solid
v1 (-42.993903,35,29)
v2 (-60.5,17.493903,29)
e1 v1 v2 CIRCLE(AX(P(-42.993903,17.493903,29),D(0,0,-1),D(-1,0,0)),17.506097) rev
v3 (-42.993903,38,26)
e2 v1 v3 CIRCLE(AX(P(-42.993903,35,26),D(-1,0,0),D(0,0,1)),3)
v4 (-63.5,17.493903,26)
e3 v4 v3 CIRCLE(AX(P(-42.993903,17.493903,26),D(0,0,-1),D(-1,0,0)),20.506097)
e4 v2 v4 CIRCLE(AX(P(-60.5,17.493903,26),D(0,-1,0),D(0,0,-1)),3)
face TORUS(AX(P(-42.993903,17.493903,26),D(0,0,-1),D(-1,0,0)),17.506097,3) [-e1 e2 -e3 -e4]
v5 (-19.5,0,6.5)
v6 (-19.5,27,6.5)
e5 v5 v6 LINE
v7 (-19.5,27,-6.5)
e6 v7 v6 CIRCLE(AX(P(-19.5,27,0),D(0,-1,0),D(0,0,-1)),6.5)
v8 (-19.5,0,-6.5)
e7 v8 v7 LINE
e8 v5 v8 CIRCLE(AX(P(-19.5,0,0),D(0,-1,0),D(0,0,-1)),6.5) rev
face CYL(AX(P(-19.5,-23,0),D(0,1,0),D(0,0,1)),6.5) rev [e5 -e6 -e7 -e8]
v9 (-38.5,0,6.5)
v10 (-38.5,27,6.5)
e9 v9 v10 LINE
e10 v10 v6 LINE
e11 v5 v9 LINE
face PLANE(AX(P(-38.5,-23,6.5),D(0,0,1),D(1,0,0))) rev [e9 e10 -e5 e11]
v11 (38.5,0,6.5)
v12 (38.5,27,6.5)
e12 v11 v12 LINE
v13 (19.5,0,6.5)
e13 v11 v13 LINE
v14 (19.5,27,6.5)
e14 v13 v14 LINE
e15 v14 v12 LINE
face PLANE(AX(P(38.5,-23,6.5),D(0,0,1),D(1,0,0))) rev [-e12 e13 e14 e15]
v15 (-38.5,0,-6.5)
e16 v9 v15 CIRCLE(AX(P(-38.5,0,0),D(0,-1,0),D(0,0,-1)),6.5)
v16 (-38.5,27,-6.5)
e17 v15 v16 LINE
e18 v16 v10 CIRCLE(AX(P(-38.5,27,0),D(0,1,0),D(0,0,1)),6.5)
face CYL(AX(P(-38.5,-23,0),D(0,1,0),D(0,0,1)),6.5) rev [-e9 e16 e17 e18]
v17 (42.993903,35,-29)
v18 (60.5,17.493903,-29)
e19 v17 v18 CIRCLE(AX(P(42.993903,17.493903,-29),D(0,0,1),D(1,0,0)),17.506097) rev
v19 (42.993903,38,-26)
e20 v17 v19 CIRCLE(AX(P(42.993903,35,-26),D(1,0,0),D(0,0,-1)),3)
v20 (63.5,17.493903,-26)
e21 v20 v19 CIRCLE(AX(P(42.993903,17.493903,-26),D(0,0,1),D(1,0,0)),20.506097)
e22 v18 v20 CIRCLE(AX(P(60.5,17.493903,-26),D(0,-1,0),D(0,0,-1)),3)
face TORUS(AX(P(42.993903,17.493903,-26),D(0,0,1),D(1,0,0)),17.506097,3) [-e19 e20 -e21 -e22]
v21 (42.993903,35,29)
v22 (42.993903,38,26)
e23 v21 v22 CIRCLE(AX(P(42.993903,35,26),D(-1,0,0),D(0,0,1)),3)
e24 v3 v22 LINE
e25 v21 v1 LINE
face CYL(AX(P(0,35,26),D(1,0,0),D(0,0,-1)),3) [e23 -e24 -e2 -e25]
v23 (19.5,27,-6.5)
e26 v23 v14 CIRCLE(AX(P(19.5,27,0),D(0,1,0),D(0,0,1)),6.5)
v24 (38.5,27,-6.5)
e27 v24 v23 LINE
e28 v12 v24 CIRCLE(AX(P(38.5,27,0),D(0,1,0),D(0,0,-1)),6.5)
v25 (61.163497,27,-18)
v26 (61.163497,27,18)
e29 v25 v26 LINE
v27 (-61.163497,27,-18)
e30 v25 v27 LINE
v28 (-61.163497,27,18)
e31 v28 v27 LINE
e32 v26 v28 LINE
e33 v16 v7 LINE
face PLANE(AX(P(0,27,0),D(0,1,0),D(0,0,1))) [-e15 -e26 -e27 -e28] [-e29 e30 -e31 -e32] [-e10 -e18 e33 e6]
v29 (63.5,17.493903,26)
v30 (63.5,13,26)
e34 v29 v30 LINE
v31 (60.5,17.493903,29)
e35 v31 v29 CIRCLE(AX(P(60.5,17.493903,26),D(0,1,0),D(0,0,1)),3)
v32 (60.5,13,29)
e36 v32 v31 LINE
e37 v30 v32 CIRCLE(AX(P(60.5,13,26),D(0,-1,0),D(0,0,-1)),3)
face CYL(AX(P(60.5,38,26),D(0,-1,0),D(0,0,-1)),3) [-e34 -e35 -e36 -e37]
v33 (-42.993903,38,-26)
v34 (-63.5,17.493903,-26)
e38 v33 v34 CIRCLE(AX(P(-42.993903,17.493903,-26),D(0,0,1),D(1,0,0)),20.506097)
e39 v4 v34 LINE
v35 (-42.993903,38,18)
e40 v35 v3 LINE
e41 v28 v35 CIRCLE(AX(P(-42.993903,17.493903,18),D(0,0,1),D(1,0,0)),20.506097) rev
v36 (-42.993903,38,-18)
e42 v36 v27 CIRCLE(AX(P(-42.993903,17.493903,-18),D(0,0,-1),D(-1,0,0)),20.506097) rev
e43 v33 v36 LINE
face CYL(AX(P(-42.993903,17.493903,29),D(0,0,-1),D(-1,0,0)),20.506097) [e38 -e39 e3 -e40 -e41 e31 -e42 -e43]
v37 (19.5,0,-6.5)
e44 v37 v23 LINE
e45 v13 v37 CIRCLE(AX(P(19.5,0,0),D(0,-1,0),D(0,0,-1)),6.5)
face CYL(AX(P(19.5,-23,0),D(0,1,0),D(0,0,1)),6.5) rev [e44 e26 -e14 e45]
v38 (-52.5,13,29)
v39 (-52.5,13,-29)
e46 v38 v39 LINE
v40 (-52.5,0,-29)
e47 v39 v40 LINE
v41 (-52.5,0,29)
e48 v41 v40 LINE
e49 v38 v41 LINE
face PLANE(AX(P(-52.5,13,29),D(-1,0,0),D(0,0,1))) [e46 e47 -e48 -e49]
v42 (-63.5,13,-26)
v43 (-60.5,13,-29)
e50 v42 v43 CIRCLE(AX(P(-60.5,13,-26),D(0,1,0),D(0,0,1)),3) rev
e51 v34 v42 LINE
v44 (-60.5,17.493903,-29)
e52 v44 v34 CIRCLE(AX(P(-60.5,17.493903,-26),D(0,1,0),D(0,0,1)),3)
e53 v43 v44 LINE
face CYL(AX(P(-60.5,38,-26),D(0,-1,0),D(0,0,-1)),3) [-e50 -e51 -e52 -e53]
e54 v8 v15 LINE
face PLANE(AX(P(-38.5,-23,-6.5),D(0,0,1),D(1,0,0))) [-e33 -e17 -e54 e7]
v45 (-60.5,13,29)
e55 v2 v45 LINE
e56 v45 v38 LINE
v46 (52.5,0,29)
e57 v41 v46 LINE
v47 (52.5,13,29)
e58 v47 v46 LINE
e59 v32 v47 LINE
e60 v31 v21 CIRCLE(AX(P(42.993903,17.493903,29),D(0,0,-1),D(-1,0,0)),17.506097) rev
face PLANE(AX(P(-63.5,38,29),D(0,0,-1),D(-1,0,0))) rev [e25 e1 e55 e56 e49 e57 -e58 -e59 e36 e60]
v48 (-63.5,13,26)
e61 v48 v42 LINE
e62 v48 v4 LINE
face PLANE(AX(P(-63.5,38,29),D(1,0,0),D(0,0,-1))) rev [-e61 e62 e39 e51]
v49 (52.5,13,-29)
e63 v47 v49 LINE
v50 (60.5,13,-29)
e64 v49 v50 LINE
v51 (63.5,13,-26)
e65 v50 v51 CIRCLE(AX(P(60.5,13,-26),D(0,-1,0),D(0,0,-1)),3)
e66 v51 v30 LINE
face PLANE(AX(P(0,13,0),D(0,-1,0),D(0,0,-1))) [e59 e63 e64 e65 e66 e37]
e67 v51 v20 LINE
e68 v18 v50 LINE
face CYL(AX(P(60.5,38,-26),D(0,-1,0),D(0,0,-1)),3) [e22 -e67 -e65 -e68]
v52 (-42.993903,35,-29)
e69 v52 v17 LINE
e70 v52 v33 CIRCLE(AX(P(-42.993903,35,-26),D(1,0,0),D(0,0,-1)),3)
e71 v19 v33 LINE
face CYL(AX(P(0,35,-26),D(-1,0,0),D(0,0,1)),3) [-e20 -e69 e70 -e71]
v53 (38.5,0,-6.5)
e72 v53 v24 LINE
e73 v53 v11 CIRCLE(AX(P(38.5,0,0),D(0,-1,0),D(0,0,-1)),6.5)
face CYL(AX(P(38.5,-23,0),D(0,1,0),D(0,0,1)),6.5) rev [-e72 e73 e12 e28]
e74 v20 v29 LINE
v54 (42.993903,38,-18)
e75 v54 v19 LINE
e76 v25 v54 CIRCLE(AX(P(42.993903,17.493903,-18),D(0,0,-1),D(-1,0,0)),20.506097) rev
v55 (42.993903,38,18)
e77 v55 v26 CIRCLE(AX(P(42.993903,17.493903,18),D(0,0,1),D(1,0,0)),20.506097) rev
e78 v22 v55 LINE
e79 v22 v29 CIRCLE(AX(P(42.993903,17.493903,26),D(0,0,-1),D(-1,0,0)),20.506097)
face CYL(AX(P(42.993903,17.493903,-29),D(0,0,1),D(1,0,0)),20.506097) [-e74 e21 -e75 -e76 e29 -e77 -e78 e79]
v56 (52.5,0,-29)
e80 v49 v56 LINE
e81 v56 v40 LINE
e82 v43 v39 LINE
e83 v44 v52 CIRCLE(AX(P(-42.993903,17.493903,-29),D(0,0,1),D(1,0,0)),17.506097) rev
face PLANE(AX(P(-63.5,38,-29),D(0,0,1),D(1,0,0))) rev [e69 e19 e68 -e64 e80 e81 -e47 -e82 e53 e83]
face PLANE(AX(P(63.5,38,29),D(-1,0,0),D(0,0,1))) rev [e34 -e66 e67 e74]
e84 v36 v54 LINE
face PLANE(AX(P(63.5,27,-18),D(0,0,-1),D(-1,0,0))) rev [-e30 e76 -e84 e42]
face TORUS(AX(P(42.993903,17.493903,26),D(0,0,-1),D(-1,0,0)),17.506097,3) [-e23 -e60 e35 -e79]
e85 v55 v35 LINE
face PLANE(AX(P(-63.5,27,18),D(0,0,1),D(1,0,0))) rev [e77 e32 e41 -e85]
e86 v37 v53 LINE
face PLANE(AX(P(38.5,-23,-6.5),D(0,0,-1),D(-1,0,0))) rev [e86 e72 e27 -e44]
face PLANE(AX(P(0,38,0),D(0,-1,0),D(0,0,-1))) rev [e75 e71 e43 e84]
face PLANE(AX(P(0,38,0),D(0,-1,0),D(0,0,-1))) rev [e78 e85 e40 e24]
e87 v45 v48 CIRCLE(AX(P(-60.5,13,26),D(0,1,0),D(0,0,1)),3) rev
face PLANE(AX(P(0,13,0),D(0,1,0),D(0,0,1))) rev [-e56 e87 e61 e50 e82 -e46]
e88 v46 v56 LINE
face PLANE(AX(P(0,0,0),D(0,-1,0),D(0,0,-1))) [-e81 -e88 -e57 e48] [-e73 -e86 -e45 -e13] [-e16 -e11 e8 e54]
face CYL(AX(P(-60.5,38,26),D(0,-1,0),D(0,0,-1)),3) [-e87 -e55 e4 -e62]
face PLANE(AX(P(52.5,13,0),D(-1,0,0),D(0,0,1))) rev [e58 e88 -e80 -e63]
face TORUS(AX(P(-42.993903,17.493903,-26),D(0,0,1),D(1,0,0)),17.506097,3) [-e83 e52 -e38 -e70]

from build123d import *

# Parameters (mm, degrees)
ESQUISSE1_W                 = 127
ESQUISSE1_H                 = 58
CREATION_PREMIER_CUBE_DEPTH = 38
ESQUISSE2_W                 = 11
ESQUISSE2_H                 = 58
ENLEVE_RECLANGLE_BAS_DEPTH  = 13
CONG_15_START               = -30
CONG_15_DEPTH               = 60
CONG_16_START               = -30
CONG_16_DEPTH               = 60
ENL_V_MAT_EXTRU_7_DEPTH     = 11
ENL_V_MAT_EXTRU_10_DEPTH    = 50
ENL_V_MAT_EXTRU_11_DEPTH    = 50
CONG_18_R                   = 3


with BuildPart() as part:
    # Esquisse1 → Creation premier cube (new body)
    with BuildSketch(Plane(origin=(0, 0, 0), x_dir=(1, 0, 0), z_dir=(0, 1, 0))):
        Rectangle(ESQUISSE1_W, ESQUISSE1_H)
    extrude(amount=CREATION_PREMIER_CUBE_DEPTH)

    # Esquisse2 → Enleve reclangle bas (cut)
    with BuildSketch(Plane.XZ):
        with Locations((58, 0)):
            Rectangle(ESQUISSE2_W, ESQUISSE2_H)
        with Locations((-58, 0)):
            Rectangle(ESQUISSE2_W, ESQUISSE2_H)
    extrude(amount=-ENLEVE_RECLANGLE_BAS_DEPTH, mode=Mode.SUBTRACT)

    # Congé15: read off the stored shape, not the designer's step
    # Congé15 outline → Congé15 (cut)
    with BuildSketch(Plane.XY.offset(CONG_15_START)):
        with BuildLine():
            Line((-63.5, 38), (-63.5, 17.493903346))
            ThreePointArc((-63.5, 17.493903346), (-57.493903346, 31.993903346), (-42.993903346, 38))
            Line((-42.993903346, 38), (-63.5, 38))
        make_face()
    extrude(amount=CONG_15_DEPTH, mode=Mode.SUBTRACT)

    # Congé16: read off the stored shape, not the designer's step
    # Congé16 outline → Congé16 (cut)
    with BuildSketch(Plane.XY.offset(CONG_16_START)):
        with BuildLine():
            ThreePointArc((42.993903346, 38), (57.493903346, 31.993903346), (63.5, 17.493903346))
            Line((63.5, 17.493903346), (63.5, 38))
            Line((63.5, 38), (42.993903346, 38))
        make_face()
    extrude(amount=CONG_16_DEPTH, mode=Mode.SUBTRACT)

    # Esquisse9 → Enlèv. mat.-Extru.7 (cut)
    with BuildSketch(Plane(origin=(0, 38, 0), x_dir=(1, 0, 0), z_dir=(0, 1, 0))):
        Polygon((-0.380283646, 18), (-63.5, 18), (-63.5, -18), (-0.380283646, -18), (63.5, -18), (63.5, 18), align=None)
    extrude(amount=-ENL_V_MAT_EXTRU_7_DEPTH, mode=Mode.SUBTRACT)

    # Esquisse10 → Enlèv. mat.-Extru.10 (cut)
    with BuildSketch(Plane(origin=(0, 27, 0), x_dir=(1, 0, 0), z_dir=(0, 1, 0))):
        with BuildLine():
            Line((-38.5, -6.5), (-19.5, -6.5))
            ThreePointArc((-19.5, -6.5), (-13, 0), (-19.5, 6.5))
            Line((-19.5, 6.5), (-38.5, 6.5))
            ThreePointArc((-38.5, 6.5), (-45, 0), (-38.5, -6.5))
        make_face()
    extrude(amount=-ENL_V_MAT_EXTRU_10_DEPTH, mode=Mode.SUBTRACT)

    # Esquisse10<3> → Enlèv. mat.-Extru.11 (cut)
    with BuildSketch(Plane(origin=(0, 27, 0), x_dir=(1, 0, 0), z_dir=(0, 1, 0))):
        with BuildLine():
            Line((38.5, -6.5), (19.5, -6.5))
            ThreePointArc((19.5, -6.5), (13, 0), (19.5, 6.5))
            Line((19.5, 6.5), (38.5, 6.5))
            ThreePointArc((38.5, 6.5), (45, 0), (38.5, -6.5))
        make_face()
        with BuildLine():
            Line((-38.5, -6.5), (-19.5, -6.5))
            ThreePointArc((-19.5, -6.5), (-13, 0), (-19.5, 6.5))
            Line((-19.5, 6.5), (-38.5, 6.5))
            ThreePointArc((-38.5, 6.5), (-45, 0), (-38.5, -6.5))
        make_face()
    extrude(amount=-ENL_V_MAT_EXTRU_11_DEPTH, mode=Mode.SUBTRACT)

    # Congé18
    cong_18_edges = [part.edges().sort_by_distance(p)[0] for p in [
        (-63.5, 15.246951673, -29),
        (-63.5, 15.246951673, 29),
        (0, 38, 29),
        (-57.493903346, 31.993903346, 29),
        (-57.493903346, 31.993903346, -29),
        (63.5, 15.246951673, -29),
        (63.5, 15.246951673, 29),
        (0, 38, -29),
        (57.493903346, 31.993903346, -29),
        (57.493903346, 31.993903346, 29),
    ]]
    fillet(cong_18_edges, radius=CONG_18_R)


solid = part.part
